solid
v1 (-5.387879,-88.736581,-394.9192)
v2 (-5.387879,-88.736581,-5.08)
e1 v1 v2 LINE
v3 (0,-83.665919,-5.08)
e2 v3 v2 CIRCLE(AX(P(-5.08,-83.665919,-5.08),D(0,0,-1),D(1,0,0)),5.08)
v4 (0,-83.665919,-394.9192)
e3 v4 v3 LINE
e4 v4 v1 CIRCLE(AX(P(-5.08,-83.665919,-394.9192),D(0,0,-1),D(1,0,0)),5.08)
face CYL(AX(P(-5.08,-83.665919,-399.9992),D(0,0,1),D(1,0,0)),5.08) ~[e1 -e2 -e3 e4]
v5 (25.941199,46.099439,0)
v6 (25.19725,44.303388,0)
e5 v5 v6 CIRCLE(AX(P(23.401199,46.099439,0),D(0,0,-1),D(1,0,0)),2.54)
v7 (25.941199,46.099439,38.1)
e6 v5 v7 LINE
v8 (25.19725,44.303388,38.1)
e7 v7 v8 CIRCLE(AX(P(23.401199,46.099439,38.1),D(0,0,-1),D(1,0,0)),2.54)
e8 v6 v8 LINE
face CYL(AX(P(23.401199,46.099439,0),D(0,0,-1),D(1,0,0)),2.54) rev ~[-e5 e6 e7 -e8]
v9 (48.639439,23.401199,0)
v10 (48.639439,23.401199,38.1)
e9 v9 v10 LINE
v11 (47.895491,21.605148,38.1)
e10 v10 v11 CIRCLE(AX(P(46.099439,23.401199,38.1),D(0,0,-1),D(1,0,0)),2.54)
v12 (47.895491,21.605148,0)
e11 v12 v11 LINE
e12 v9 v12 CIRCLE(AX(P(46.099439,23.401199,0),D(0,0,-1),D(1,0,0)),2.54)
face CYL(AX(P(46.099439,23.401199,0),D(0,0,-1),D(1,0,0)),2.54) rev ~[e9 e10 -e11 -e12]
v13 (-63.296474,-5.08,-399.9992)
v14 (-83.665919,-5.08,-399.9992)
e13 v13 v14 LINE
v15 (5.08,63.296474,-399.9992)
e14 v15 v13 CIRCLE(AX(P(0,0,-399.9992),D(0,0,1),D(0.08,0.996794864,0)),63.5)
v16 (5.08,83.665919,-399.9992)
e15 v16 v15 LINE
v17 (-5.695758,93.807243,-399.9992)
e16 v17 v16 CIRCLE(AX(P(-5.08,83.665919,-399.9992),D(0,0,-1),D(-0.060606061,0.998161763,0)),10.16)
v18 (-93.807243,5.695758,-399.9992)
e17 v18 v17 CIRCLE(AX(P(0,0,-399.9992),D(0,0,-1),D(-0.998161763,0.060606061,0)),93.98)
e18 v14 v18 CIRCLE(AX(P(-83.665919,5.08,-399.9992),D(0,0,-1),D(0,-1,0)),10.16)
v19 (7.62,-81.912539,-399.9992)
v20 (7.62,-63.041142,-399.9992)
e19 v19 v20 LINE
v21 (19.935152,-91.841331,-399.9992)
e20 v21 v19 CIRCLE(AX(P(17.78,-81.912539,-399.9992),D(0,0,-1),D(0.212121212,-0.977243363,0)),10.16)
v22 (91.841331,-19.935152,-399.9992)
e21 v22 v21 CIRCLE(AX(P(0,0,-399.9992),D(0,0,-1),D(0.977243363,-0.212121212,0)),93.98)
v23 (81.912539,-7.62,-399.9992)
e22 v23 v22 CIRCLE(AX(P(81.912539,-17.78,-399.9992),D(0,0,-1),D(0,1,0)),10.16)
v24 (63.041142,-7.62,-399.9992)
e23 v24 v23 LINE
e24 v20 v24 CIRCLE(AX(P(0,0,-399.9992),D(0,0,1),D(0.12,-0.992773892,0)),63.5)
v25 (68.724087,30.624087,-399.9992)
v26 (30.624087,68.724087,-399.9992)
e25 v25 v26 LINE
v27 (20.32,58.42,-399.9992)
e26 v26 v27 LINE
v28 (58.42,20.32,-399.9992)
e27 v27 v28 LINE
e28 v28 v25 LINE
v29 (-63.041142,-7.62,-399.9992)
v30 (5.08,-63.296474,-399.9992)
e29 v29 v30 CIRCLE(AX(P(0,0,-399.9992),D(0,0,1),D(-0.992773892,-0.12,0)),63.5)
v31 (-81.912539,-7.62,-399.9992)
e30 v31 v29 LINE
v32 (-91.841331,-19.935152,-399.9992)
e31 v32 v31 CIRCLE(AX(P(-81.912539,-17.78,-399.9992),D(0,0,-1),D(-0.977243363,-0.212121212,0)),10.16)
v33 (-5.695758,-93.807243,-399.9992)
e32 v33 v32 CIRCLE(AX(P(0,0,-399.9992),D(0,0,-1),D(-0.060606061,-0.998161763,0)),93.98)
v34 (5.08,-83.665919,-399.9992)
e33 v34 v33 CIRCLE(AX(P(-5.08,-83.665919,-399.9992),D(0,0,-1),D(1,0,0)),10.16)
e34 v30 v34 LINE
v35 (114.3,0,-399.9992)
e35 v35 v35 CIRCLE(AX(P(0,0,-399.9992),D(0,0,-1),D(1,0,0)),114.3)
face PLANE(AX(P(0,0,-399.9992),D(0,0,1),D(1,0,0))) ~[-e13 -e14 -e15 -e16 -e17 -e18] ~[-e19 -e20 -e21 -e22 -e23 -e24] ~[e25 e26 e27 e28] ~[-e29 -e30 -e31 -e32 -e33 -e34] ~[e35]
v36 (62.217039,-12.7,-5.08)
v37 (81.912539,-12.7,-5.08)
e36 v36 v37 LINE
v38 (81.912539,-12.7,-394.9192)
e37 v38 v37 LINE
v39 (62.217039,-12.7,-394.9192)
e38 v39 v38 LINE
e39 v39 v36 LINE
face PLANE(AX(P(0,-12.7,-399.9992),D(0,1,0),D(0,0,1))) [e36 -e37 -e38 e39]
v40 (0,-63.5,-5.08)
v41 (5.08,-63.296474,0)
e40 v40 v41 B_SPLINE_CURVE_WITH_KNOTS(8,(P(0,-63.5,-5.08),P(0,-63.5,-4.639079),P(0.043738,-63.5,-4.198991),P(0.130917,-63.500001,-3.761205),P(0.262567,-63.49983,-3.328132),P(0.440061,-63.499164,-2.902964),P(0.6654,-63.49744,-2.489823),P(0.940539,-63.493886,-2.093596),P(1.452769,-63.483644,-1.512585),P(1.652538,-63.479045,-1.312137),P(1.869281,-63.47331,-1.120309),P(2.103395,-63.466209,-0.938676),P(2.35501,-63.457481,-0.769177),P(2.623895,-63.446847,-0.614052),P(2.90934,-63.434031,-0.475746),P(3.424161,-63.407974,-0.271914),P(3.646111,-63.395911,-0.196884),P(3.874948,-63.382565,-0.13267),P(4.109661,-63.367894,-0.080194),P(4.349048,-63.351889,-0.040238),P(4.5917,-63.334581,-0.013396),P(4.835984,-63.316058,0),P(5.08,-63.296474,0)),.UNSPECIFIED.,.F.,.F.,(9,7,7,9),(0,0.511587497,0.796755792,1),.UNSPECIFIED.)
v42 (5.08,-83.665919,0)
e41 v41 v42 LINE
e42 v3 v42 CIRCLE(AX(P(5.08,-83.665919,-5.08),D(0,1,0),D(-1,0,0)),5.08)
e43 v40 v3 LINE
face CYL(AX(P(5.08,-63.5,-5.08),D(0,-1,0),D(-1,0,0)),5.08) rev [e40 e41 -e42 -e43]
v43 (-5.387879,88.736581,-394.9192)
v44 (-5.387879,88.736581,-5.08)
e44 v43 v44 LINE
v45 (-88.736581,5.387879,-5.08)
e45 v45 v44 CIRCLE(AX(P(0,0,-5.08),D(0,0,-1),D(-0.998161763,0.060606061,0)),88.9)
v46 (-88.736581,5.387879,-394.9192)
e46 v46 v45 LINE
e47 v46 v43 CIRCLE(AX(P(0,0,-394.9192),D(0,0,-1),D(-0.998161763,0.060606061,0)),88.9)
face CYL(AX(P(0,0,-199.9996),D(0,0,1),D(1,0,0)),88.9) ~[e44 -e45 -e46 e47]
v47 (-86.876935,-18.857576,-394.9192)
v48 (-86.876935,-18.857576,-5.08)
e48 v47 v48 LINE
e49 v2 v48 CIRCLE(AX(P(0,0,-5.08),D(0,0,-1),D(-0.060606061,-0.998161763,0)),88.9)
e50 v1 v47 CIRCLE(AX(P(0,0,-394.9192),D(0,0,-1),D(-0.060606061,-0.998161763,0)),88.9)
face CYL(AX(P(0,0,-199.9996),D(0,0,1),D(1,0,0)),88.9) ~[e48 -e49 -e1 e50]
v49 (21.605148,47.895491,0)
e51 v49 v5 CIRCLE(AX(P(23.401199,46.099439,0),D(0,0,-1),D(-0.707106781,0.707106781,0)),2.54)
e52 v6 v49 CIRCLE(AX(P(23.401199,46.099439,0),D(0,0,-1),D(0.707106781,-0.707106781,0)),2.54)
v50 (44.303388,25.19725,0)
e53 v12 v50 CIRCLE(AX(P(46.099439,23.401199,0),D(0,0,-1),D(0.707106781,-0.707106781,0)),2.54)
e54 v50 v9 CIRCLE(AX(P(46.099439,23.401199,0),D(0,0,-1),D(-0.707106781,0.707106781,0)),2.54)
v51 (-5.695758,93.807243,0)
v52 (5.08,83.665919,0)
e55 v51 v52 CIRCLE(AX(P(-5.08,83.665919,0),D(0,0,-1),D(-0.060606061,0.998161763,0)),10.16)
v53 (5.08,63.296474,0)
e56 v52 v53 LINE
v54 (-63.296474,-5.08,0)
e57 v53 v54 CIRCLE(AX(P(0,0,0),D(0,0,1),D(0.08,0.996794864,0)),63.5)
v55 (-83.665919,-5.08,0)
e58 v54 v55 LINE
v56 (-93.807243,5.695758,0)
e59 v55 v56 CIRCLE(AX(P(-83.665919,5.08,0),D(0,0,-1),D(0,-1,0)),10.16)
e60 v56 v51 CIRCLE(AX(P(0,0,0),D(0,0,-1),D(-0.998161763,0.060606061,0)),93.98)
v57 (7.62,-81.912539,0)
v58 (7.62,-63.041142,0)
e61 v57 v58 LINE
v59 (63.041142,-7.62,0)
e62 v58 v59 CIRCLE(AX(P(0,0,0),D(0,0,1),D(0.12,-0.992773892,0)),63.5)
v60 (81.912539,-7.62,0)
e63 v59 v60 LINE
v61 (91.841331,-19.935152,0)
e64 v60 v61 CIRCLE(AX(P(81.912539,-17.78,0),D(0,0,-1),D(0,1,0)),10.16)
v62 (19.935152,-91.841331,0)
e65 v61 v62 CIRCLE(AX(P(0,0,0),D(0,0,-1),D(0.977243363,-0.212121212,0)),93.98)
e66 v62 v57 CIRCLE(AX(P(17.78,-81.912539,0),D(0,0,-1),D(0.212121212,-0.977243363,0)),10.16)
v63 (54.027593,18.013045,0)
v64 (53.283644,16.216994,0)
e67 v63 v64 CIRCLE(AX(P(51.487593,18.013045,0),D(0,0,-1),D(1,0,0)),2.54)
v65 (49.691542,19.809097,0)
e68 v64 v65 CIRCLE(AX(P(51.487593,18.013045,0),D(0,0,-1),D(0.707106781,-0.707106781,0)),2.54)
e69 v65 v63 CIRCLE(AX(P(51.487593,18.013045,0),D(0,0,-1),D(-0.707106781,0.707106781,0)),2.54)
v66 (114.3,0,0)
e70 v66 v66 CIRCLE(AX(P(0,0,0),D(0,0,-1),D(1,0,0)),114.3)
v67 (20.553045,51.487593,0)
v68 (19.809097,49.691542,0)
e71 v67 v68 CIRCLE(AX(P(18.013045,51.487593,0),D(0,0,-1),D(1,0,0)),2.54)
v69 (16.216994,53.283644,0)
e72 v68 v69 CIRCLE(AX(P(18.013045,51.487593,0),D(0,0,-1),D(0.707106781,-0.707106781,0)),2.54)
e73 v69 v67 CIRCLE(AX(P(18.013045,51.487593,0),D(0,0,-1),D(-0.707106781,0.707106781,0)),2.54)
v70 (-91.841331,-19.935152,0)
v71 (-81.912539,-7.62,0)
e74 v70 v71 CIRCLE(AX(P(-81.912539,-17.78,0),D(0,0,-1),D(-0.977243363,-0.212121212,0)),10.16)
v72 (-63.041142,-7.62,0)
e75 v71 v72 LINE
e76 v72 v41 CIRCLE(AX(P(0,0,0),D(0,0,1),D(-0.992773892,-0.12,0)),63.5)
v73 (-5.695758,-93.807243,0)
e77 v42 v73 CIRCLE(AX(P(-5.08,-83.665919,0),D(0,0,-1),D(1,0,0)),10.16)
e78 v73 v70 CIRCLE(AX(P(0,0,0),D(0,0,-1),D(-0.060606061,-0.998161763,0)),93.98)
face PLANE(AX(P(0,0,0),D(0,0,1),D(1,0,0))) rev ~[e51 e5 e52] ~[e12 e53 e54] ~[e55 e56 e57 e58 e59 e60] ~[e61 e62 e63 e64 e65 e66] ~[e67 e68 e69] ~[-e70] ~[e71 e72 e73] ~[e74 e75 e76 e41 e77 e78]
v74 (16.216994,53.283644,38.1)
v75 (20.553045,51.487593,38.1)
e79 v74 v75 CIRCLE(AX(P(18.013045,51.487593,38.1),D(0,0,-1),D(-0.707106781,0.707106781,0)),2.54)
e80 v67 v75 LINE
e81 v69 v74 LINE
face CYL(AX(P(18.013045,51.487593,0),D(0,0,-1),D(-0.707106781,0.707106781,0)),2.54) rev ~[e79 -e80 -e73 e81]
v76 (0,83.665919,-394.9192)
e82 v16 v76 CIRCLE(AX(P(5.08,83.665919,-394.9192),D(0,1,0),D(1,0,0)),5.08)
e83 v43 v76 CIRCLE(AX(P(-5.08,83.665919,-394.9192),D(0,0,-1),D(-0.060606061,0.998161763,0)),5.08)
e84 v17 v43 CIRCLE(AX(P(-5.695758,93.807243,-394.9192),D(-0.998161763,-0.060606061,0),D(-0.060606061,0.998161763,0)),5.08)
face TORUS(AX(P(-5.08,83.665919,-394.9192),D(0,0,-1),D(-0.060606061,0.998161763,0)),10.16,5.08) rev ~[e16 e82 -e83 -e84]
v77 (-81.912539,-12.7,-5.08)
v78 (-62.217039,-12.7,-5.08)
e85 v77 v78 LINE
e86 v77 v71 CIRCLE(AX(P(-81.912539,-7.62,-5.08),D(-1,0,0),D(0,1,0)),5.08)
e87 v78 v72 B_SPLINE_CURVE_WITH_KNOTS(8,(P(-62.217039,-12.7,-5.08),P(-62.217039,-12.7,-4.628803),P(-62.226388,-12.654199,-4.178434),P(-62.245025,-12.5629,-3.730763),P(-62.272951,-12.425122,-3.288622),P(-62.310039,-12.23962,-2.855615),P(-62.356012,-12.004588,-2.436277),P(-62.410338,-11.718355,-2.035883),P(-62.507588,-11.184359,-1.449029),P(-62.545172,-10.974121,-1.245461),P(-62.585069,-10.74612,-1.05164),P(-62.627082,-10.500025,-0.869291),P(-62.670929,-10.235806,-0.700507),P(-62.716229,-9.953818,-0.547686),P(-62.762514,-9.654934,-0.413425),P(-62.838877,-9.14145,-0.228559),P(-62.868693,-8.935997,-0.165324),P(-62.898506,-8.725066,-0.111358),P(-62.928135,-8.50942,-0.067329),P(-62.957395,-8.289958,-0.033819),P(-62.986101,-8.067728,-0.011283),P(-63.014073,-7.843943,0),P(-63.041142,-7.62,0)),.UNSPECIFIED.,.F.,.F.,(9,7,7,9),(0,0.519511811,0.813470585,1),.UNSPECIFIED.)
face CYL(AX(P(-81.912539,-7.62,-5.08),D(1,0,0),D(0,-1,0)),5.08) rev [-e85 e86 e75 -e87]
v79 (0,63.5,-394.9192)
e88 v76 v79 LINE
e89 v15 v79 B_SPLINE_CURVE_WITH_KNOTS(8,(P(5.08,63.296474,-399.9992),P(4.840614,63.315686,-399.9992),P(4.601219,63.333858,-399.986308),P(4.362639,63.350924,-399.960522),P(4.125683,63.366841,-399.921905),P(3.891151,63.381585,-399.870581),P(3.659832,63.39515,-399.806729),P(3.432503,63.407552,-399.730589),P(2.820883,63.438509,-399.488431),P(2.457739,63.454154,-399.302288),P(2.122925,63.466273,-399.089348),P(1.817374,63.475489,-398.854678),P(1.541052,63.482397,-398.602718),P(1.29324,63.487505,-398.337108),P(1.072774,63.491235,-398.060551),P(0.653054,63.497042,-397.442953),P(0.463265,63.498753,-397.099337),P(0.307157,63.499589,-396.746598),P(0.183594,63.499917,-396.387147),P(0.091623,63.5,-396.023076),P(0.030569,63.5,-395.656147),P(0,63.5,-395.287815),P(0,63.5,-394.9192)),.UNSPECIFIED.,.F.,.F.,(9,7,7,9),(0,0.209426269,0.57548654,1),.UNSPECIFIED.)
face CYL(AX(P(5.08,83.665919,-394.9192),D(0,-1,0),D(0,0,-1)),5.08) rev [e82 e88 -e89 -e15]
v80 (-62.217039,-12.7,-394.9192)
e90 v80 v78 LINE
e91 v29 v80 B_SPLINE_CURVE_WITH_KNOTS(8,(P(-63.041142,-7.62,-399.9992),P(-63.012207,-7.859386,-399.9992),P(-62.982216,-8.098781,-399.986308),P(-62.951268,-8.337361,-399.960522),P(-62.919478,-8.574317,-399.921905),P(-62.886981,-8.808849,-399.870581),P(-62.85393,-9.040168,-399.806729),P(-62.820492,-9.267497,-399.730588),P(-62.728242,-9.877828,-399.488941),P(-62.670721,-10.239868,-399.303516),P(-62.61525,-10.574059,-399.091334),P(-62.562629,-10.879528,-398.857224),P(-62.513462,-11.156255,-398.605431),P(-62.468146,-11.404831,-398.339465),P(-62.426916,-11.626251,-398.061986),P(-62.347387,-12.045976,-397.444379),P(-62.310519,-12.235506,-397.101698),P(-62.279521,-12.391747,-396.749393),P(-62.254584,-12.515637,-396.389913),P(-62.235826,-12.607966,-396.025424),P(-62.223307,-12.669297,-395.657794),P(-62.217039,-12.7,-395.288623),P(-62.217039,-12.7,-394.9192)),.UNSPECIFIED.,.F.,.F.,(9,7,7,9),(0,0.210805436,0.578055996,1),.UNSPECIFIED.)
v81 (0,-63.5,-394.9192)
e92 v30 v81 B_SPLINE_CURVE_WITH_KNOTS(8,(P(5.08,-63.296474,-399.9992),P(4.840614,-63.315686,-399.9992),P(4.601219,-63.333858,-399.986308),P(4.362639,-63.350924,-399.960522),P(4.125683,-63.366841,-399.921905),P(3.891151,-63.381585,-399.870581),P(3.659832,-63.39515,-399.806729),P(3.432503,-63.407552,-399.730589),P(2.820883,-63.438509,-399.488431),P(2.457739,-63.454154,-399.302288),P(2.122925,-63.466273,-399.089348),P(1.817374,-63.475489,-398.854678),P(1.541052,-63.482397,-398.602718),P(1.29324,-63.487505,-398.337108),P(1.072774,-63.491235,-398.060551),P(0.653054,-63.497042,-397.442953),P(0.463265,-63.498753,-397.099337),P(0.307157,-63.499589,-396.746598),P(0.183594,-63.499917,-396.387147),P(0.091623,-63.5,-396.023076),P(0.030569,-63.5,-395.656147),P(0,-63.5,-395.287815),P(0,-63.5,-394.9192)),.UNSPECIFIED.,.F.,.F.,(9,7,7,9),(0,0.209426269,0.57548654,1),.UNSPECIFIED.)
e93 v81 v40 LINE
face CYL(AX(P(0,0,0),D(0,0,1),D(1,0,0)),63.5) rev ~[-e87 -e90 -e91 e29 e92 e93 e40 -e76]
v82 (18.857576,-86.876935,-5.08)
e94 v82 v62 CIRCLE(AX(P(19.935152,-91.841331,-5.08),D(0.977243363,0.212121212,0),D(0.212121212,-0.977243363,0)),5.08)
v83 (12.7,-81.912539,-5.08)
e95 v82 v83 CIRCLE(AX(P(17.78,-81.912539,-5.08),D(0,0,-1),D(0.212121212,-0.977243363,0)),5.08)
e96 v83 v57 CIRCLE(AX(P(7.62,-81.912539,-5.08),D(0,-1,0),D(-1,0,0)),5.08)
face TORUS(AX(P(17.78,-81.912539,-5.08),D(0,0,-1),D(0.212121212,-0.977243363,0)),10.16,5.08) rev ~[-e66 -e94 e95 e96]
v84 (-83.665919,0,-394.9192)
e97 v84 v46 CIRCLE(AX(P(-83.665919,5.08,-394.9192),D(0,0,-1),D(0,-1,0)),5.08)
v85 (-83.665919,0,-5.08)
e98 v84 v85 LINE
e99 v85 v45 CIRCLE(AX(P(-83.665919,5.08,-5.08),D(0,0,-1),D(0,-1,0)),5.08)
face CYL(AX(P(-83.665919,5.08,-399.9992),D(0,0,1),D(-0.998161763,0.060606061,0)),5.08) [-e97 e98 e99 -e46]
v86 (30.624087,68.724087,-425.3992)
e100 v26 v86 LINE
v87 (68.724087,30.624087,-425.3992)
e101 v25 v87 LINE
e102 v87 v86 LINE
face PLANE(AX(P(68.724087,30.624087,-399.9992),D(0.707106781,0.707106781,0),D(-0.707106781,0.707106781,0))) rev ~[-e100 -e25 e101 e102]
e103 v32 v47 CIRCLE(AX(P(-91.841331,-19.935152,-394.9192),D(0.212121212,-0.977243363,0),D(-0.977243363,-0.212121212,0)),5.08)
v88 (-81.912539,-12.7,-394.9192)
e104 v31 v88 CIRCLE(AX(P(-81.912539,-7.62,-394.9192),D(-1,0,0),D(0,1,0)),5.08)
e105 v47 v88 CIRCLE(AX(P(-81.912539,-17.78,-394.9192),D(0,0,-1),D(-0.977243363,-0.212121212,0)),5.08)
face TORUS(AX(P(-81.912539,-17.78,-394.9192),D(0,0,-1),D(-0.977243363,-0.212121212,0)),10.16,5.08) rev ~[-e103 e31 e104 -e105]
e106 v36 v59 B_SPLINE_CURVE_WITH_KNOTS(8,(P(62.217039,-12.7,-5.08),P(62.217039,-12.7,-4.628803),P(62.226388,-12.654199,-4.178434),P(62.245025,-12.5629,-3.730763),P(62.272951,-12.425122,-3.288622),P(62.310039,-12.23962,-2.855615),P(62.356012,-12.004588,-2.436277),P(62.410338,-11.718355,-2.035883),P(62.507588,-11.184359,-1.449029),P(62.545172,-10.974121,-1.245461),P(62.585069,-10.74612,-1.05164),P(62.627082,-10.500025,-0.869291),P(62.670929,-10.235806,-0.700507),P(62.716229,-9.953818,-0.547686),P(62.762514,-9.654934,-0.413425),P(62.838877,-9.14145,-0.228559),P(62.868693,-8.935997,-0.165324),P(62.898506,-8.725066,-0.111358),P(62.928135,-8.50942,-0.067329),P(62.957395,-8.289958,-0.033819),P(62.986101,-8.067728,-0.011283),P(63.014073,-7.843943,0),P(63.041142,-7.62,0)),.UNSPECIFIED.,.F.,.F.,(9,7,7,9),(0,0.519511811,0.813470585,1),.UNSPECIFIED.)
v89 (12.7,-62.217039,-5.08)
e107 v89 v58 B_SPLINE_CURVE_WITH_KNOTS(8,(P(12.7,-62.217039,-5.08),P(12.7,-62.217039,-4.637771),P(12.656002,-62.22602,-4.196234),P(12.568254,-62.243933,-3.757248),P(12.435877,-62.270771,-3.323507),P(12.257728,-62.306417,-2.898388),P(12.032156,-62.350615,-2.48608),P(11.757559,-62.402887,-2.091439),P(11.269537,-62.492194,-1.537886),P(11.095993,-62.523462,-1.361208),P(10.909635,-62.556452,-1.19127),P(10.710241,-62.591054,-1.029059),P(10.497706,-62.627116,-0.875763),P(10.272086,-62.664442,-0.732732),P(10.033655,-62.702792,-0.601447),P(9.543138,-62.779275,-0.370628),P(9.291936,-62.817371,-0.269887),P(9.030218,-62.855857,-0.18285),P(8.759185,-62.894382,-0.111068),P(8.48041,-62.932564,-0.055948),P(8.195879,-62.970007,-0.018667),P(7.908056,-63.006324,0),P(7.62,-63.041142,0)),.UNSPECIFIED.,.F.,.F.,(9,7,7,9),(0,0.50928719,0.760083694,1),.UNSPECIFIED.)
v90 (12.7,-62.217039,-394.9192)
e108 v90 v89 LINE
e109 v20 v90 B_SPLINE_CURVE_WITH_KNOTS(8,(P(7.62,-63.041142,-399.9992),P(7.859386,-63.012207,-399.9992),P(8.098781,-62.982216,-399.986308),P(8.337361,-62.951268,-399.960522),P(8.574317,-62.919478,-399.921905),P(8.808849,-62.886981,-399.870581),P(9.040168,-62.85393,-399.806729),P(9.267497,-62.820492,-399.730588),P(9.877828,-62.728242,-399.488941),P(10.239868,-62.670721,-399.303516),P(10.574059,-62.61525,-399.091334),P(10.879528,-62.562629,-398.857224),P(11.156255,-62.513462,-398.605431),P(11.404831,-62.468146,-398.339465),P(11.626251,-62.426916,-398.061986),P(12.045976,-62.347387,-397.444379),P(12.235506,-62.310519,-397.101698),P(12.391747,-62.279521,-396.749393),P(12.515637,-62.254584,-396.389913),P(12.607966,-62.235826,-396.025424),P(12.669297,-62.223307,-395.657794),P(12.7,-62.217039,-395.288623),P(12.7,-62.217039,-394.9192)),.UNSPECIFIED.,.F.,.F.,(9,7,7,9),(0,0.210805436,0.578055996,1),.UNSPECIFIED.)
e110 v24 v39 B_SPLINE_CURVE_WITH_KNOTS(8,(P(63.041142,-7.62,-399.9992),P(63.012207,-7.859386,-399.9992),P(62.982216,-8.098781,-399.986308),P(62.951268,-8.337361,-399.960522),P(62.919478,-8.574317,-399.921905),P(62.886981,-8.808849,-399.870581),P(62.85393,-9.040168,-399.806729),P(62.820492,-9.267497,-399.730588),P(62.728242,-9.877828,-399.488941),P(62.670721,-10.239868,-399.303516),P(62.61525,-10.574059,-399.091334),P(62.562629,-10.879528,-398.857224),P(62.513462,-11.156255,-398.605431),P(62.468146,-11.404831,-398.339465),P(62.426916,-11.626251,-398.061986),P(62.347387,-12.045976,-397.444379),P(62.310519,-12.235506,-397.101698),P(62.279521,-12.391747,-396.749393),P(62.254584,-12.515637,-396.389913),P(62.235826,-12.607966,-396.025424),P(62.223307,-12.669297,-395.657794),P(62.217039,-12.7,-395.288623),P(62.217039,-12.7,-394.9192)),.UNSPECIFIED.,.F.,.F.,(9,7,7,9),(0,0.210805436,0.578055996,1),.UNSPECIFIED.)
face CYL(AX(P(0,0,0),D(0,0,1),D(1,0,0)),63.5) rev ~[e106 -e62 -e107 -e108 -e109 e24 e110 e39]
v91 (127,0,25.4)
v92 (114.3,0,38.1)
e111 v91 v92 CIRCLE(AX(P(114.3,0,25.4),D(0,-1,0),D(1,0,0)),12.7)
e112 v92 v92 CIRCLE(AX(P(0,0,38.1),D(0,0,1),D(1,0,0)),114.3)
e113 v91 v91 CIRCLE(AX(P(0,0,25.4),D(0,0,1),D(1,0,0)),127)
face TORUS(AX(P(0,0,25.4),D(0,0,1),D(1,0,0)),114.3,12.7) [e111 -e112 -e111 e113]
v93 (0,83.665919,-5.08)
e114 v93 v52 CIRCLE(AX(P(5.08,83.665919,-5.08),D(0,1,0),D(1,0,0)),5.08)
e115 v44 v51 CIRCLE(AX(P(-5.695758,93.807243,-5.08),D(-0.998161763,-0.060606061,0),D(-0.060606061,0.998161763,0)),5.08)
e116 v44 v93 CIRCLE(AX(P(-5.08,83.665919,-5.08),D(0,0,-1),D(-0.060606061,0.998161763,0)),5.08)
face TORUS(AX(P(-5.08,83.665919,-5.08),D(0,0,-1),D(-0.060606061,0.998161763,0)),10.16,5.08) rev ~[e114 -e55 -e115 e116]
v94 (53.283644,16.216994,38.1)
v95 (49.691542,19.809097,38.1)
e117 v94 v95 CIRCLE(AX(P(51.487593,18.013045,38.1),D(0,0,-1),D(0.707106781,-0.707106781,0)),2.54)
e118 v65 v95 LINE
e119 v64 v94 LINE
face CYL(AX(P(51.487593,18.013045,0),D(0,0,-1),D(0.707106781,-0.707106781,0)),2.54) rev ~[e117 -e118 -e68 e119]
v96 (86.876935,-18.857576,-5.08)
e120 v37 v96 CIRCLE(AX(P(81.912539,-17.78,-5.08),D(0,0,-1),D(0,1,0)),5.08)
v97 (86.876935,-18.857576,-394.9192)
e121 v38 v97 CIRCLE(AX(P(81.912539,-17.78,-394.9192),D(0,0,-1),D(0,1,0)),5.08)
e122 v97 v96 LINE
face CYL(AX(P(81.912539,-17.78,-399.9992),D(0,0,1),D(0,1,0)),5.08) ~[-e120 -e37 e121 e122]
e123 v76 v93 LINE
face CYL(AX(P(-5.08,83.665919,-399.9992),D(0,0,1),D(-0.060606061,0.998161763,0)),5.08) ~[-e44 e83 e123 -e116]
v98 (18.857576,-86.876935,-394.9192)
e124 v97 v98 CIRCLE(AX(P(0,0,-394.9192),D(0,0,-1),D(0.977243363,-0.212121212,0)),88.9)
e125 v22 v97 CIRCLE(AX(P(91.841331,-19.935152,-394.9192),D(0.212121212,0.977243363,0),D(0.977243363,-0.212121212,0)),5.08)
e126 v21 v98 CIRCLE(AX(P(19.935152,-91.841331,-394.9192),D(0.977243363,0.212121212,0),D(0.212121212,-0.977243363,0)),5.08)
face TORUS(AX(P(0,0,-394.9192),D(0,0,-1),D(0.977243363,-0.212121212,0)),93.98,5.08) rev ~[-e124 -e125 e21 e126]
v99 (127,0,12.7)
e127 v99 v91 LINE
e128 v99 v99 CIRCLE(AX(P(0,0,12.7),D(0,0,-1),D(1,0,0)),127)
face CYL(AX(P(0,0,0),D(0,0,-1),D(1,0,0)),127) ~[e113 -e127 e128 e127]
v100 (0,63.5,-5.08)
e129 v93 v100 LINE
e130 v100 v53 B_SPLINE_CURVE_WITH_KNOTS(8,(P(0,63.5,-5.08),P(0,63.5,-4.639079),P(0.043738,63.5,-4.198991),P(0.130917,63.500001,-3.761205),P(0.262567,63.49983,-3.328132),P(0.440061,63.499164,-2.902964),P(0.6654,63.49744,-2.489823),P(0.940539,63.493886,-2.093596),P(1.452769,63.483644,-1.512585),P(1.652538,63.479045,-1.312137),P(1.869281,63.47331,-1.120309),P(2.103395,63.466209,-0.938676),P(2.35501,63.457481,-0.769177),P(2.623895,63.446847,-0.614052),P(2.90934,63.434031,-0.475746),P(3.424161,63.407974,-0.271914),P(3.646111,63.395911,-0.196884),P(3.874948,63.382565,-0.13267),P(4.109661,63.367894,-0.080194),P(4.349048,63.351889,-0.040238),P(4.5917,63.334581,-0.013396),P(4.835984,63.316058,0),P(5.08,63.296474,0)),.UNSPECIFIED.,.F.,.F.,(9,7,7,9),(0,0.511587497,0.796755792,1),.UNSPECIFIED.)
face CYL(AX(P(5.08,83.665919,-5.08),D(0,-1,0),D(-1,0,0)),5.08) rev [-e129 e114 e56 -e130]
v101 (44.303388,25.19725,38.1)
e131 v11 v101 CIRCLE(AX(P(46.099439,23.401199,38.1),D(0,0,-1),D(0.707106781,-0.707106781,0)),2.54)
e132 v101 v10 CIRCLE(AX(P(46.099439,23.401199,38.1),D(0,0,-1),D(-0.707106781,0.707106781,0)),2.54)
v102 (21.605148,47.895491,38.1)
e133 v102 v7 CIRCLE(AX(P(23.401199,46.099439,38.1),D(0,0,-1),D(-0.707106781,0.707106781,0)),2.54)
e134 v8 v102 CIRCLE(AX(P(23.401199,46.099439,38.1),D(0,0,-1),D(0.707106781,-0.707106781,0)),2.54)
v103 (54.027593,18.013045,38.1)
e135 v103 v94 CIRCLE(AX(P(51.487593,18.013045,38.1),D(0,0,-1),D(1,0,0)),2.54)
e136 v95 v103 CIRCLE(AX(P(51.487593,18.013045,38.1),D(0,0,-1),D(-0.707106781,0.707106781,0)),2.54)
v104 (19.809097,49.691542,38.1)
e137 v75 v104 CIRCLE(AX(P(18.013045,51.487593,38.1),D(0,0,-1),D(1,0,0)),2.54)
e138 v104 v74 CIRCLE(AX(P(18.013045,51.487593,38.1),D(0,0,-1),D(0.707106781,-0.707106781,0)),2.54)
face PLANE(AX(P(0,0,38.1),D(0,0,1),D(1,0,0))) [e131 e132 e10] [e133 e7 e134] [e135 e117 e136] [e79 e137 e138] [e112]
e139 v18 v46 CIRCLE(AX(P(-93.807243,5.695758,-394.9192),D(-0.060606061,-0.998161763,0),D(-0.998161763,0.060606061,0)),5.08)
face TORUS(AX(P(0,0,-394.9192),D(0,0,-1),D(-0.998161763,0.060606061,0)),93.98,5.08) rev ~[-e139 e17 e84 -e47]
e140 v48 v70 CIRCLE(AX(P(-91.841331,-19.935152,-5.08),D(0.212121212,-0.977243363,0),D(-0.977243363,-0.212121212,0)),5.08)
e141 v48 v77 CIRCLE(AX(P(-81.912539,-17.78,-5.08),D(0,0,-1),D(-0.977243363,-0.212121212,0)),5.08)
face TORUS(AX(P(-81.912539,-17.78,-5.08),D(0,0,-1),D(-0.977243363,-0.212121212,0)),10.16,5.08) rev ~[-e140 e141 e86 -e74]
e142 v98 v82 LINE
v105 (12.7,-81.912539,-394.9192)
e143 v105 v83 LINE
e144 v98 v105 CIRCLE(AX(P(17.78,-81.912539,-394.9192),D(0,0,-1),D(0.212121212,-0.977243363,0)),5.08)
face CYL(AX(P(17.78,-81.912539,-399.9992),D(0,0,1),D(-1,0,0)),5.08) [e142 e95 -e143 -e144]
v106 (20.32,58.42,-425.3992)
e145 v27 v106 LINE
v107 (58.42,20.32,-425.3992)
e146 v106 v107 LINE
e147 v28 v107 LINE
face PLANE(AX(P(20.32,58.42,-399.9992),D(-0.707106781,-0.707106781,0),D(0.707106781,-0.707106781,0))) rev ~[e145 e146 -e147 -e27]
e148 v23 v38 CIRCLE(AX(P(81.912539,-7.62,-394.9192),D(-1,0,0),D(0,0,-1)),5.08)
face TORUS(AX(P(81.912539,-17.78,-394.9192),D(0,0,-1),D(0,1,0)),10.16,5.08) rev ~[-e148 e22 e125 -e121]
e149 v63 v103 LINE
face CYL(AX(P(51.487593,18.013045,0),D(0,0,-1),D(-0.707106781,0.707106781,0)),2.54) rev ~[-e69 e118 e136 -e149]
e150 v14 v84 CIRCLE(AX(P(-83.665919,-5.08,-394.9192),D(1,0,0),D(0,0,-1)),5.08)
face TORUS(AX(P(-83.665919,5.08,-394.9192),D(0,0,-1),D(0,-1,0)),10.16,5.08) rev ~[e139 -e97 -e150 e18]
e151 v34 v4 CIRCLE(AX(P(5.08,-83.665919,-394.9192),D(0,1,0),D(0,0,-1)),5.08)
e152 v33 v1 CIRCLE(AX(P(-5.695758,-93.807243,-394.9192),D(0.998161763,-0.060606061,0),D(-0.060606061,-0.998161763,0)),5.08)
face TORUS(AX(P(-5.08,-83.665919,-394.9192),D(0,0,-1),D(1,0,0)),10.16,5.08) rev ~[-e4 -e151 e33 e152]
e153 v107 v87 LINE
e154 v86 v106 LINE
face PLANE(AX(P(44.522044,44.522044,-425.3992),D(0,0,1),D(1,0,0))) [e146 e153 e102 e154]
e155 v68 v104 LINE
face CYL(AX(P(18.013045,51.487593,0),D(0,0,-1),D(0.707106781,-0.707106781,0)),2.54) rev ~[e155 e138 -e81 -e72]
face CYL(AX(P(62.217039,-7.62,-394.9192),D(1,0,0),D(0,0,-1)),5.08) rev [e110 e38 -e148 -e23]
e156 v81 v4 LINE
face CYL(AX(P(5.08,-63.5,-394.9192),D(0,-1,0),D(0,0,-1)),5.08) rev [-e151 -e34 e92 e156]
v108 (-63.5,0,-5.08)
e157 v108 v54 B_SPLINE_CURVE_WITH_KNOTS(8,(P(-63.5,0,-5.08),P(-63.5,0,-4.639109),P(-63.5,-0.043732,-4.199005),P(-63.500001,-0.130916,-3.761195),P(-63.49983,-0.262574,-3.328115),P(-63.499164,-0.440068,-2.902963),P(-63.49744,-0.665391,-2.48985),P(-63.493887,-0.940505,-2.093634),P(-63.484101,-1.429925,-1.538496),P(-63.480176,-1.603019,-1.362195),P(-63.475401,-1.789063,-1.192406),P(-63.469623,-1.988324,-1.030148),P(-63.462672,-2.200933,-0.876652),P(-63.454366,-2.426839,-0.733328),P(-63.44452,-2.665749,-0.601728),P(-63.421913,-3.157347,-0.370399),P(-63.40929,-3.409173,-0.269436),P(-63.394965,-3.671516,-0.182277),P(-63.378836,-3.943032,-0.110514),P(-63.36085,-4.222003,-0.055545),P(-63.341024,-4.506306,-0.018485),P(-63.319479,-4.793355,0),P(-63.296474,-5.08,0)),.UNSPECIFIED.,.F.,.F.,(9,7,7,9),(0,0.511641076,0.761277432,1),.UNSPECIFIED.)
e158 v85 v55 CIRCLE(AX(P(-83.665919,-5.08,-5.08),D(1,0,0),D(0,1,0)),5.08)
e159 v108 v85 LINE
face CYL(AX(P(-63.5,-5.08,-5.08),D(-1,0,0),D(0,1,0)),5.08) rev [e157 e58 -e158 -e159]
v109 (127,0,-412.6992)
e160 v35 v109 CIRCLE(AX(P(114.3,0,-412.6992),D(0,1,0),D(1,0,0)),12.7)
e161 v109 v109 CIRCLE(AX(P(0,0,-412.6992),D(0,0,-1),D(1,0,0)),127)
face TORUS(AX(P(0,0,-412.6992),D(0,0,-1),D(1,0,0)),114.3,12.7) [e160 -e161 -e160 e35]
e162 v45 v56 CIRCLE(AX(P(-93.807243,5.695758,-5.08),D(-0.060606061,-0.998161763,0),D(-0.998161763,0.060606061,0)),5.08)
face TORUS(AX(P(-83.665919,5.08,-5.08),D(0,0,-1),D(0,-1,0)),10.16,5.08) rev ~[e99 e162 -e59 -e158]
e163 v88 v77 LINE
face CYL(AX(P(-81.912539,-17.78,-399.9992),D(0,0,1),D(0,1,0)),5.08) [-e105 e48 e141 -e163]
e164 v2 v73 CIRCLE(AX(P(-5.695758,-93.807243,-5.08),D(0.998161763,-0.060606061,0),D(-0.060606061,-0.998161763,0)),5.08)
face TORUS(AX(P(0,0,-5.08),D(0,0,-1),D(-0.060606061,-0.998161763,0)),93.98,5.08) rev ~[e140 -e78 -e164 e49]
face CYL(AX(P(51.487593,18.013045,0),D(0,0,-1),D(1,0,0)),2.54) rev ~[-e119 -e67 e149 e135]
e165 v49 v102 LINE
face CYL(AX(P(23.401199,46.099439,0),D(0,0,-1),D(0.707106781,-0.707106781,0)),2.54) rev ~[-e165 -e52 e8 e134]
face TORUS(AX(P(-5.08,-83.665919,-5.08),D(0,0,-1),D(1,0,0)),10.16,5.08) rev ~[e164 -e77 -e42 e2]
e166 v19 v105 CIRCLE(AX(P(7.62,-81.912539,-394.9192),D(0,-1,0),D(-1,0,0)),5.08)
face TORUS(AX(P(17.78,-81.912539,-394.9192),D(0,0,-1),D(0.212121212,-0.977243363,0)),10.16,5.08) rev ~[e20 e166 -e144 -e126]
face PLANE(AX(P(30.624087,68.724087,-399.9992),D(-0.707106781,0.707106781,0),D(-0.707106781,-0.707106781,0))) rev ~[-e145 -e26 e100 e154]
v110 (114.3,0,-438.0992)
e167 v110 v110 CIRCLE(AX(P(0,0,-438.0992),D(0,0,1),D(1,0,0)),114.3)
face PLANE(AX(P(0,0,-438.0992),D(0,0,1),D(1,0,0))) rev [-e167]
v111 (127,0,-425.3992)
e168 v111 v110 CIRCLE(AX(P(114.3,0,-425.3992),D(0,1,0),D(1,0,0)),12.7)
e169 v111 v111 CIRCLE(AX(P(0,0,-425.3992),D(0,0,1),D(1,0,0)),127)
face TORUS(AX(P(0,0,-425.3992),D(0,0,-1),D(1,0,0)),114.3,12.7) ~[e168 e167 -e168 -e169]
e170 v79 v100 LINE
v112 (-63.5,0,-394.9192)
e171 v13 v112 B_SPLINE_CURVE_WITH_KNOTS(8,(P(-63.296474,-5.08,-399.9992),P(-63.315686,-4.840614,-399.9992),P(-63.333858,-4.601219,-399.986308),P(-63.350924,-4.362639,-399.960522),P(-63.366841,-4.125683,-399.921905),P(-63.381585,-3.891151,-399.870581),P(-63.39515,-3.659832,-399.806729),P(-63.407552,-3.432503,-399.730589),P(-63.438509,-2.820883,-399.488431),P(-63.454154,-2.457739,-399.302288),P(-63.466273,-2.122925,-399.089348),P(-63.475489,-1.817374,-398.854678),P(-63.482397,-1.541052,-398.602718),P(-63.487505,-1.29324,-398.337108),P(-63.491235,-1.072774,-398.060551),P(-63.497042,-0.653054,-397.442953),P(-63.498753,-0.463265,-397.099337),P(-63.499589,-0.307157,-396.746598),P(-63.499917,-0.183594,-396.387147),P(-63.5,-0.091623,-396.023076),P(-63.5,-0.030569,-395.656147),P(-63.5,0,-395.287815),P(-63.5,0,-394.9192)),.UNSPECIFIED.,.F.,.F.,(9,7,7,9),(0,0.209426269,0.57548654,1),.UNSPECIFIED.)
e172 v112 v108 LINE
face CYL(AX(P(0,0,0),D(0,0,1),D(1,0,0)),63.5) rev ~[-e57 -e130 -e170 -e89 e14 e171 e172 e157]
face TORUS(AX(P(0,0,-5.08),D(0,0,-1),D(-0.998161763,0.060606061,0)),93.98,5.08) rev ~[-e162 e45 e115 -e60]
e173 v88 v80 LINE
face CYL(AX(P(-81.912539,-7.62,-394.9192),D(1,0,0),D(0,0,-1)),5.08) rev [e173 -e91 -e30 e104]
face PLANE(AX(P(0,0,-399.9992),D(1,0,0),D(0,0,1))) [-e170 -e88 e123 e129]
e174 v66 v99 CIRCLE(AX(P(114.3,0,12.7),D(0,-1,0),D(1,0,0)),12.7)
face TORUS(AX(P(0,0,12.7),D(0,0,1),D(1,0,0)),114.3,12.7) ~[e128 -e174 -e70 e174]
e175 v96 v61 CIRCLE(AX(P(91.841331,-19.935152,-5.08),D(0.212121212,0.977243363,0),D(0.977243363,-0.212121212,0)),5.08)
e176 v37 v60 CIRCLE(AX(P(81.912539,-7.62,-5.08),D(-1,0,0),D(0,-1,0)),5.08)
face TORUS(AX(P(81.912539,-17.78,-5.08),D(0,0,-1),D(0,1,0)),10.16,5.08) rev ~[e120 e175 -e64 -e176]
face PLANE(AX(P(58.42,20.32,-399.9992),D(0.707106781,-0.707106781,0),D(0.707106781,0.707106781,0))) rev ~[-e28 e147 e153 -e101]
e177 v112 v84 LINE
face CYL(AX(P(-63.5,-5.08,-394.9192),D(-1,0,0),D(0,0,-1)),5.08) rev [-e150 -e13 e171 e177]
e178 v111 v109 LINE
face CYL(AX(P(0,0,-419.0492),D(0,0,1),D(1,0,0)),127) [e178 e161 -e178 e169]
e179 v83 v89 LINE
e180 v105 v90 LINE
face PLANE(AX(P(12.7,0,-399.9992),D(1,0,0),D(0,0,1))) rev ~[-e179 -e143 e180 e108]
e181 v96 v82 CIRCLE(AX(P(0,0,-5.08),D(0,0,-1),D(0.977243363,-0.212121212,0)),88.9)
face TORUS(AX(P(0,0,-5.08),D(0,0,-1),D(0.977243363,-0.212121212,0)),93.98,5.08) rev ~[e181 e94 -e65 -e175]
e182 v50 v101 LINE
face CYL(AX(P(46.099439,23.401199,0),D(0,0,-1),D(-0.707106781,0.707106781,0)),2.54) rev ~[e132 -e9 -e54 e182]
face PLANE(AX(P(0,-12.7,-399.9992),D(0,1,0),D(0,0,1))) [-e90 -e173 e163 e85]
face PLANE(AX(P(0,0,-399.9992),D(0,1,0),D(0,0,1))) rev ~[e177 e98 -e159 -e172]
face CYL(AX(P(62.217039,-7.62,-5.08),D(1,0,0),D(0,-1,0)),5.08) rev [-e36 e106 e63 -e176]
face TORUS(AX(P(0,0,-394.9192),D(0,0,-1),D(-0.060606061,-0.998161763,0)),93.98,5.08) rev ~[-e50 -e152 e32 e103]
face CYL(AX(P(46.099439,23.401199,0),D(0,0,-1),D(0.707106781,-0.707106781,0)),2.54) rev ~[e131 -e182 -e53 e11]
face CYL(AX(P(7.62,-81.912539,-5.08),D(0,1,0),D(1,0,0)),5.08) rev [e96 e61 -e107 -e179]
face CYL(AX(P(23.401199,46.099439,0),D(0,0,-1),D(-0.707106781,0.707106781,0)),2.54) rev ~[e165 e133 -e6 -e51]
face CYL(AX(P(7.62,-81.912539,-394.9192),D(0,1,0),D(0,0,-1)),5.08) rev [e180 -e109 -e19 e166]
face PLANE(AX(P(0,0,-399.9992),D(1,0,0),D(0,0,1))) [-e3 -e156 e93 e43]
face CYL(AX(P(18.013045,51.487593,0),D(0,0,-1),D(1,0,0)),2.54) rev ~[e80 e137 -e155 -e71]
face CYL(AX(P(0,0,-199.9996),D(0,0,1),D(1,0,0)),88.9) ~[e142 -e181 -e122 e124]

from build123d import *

# Parameters (mm, degrees)
F0_R      = 127
F1_DEPTH  = 38.1
F2_W      = 88.9
F2_H      = 399.9992
F3_ANGLE  = 278
F4_W      = 127
F4_H      = 38.1
F6_W      = 12.7
F6_H      = 399.9992
F7_DEPTH  = 1270
F8_W      = 12.7
F8_H      = 399.9992
F9_DEPTH  = 1270
F10_R     = 63.5
F11_DEPTH = 399.9992
F12_R     = 12.7
F13_R     = 12.7
F14_F1_R  = 5.08
F14_F2_R  = 5.08
F16_DEPTH = 25.4
F18_DEPTH = 38.101
F19_DEPTH = 38.101


with BuildPart() as f1:
    # F0 (on Top) → F1 (new body)
    with BuildSketch(Plane.XY):
        Circle(F0_R)
    extrude(amount=F1_DEPTH)

    # F2 (on Front) → F3 (revolve)
    with BuildSketch(Plane.XZ):
        with Locations((44.45, -199.9996)):
            Rectangle(F2_W, F2_H)
    revolve(axis=Axis((0, 0, -199.9996), (0, 0, -1)), revolution_arc=F3_ANGLE)

    # F4 (on Front) → F5 (revolve)
    with BuildSketch(Plane.XZ):
        with Locations((63.5, -419.0492)):
            Rectangle(F4_W, F4_H)
    revolve(axis=Axis((0, 0, -399.9992), (0, 0, 1)))

    # F6 (on Front) → F7 (cut, symmetric)
    with BuildSketch(Plane.XZ):
        with Locations((6.35, -199.9996)):
            Rectangle(F6_W, F6_H)
    extrude(amount=F7_DEPTH, both=True, mode=Mode.SUBTRACT)

    # F8 (on Right) → F9 (cut, symmetric)
    with BuildSketch(Plane.YZ):
        with Locations((-6.35, -199.9996)):
            Rectangle(F8_W, F8_H)
    extrude(amount=F9_DEPTH, both=True, mode=Mode.SUBTRACT)

    # F10 (on Top) → F11 (cut)
    with BuildSketch(Plane.XY):
        Circle(F10_R)
    extrude(amount=-F11_DEPTH, mode=Mode.SUBTRACT)

    # F12
    f12_edges = [f1.edges().sort_by_distance(p)[0] for p in [
        (127, 0, 19.05),
        (-127, 0, 0),
        (-127, 0, 38.1),
    ]]
    fillet(f12_edges, radius=F12_R)

    # F13
    f13_edges = [f1.edges().sort_by_distance(p)[0] for p in [
        (-127, 0, -438.0992),
        (127, 0, -419.0492),
        (-127, 0, -399.9992),
    ]]
    fillet(f13_edges, radius=F13_R)

    # F14: fillet of radius 5.08 on 18 edges, made by hand

    # F14_f1
    f14_f1_edges = [f1.edges().sort_by_distance(p)[0] for p in [
        (87.9881810245, -12.7, -199.9996),
        (12.7, -87.9881810245, -199.9996),
        (0, -88.9, -199.9996),
        (-87.9881810245, -12.7, -199.9996),
        (-88.9, 0, -199.9996),
        (0, 88.9, -199.9996),
    ]]
    fillet(f14_f1_edges, radius=F14_F1_R)

    # F14_f2
    f14_f2_edges = [f1.edges().sort_by_distance(p)[0] for p in [
        (62.8617928475, -62.8617928475, 0),
        (62.8617928475, -62.8617928475, -399.9992),
        (-57.8702669833, -67.4851257632, 0),
        (-57.8702669833, -67.4851257632, -399.9992),
        (-62.8617928475, 62.8617928475, 0),
        (-62.8617928475, 62.8617928475, -399.9992),
        (0, 73.5829594937, -399.9992),
        (-73.5829594937, 0, -399.9992),
        (0, -73.5829594937, -399.9992),
        (0, 73.5829594937, 0),
        (-73.5829594937, 0, 0),
        (0, -73.5829594937, 0),
        (-1.5984503624, -87.3652719201, 0),
        (-87.3652719201, 1.5984503624, 0),
        (-1.5984503624, 87.3652719201, 0),
        (-1.5984503624, -87.3652719201, -399.9992),
        (-87.3652719201, 1.5984503624, -399.9992),
        (-1.5984503624, 87.3652719201, -399.9992),
        (-85.8673133591, -14.5915587545, -399.9992),
        (-85.8673133591, -14.5915587545, 0),
        (85.8673133591, -14.5915587545, -399.9992),
        (14.5915587545, -85.8673133591, -399.9992),
        (85.8673133591, -14.5915587545, 0),
        (14.5915587545, -85.8673133591, 0),
    ]]
    fillet(f14_f2_edges, radius=F14_F2_R)

    # F15 (on face) → F16 (cut)
    with BuildSketch(Plane.XY.offset(-399.9992)):
        Polygon((30.6240873449, 68.7240873449), (20.32, 58.42), (58.42, 20.32), (68.7240873449, 30.6240873449), align=None)
    extrude(amount=-F16_DEPTH, mode=Mode.SUBTRACT)

    # F17 (on face) → F18 (cut, through all)
    with BuildSketch(Plane(origin=(0, 0, 0), x_dir=(1, 0, 0), z_dir=(0, 0, -1))):
        with BuildLine():
            ThreePointArc((21.6051478316, -47.8954906697), (24.373214974, -48.446093458), (25.9411990558, -46.0994394454))
            ThreePointArc((25.9411990558, -46.0994394454), (25.7478530684, -45.1274235272), (25.19725028, -44.3033882212))
            Line((25.19725028, -44.3033882212), (21.6051478316, -47.8954906697))
        make_face()
        with BuildLine():
            Line((21.6051478316, -47.8954906697), (25.19725028, -44.3033882212))
            ThreePointArc((25.19725028, -44.3033882212), (21.6051478316, -44.3033882212), (21.6051478316, -47.8954906697))
        make_face()
        with BuildLine():
            Line((47.8954906697, -21.6051478316), (44.3033882212, -25.19725028))
            ThreePointArc((44.3033882212, -25.19725028), (47.0714553637, -25.7478530684), (48.6394394454, -23.4011990558))
            ThreePointArc((48.6394394454, -23.4011990558), (48.446093458, -22.4291831376), (47.8954906697, -21.6051478316))
        make_face()
        with BuildLine():
            ThreePointArc((47.8954906697, -21.6051478316), (44.3033882212, -21.6051478316), (44.3033882212, -25.19725028))
            Line((44.3033882212, -25.19725028), (47.8954906697, -21.6051478316))
        make_face()
    extrude(amount=-F18_DEPTH, mode=Mode.SUBTRACT)

    # F17 (on face) → F19 (cut, through all)
    with BuildSketch(Plane(origin=(0, 0, 0), x_dir=(1, 0, 0), z_dir=(0, 0, -1))):
        with BuildLine():
            ThreePointArc((20.5530453832, -51.4875931181), (20.3596993958, -50.5155771999), (19.8090966074, -49.6915418939))
            Line((19.8090966074, -49.6915418939), (16.216994159, -53.2836443423))
            ThreePointArc((16.216994159, -53.2836443423), (18.9850613014, -53.8342471307), (20.5530453832, -51.4875931181))
        make_face()
        with BuildLine():
            Line((16.216994159, -53.2836443423), (19.8090966074, -49.6915418939))
            ThreePointArc((19.8090966074, -49.6915418939), (16.216994159, -49.6915418939), (16.216994159, -53.2836443423))
        make_face()
        with BuildLine():
            Line((53.2836443423, -16.216994159), (49.6915418939, -19.8090966074))
            ThreePointArc((49.6915418939, -19.8090966074), (52.4596090363, -20.3596993958), (54.0275931181, -18.0130453832))
            ThreePointArc((54.0275931181, -18.0130453832), (53.8342471307, -17.041029465), (53.2836443423, -16.216994159))
        make_face()
        with BuildLine():
            ThreePointArc((53.2836443423, -16.216994159), (49.6915418939, -16.216994159), (49.6915418939, -19.8090966074))
            Line((49.6915418939, -19.8090966074), (53.2836443423, -16.216994159))
        make_face()
    extrude(amount=-F19_DEPTH, mode=Mode.SUBTRACT)


solid = f1.part
